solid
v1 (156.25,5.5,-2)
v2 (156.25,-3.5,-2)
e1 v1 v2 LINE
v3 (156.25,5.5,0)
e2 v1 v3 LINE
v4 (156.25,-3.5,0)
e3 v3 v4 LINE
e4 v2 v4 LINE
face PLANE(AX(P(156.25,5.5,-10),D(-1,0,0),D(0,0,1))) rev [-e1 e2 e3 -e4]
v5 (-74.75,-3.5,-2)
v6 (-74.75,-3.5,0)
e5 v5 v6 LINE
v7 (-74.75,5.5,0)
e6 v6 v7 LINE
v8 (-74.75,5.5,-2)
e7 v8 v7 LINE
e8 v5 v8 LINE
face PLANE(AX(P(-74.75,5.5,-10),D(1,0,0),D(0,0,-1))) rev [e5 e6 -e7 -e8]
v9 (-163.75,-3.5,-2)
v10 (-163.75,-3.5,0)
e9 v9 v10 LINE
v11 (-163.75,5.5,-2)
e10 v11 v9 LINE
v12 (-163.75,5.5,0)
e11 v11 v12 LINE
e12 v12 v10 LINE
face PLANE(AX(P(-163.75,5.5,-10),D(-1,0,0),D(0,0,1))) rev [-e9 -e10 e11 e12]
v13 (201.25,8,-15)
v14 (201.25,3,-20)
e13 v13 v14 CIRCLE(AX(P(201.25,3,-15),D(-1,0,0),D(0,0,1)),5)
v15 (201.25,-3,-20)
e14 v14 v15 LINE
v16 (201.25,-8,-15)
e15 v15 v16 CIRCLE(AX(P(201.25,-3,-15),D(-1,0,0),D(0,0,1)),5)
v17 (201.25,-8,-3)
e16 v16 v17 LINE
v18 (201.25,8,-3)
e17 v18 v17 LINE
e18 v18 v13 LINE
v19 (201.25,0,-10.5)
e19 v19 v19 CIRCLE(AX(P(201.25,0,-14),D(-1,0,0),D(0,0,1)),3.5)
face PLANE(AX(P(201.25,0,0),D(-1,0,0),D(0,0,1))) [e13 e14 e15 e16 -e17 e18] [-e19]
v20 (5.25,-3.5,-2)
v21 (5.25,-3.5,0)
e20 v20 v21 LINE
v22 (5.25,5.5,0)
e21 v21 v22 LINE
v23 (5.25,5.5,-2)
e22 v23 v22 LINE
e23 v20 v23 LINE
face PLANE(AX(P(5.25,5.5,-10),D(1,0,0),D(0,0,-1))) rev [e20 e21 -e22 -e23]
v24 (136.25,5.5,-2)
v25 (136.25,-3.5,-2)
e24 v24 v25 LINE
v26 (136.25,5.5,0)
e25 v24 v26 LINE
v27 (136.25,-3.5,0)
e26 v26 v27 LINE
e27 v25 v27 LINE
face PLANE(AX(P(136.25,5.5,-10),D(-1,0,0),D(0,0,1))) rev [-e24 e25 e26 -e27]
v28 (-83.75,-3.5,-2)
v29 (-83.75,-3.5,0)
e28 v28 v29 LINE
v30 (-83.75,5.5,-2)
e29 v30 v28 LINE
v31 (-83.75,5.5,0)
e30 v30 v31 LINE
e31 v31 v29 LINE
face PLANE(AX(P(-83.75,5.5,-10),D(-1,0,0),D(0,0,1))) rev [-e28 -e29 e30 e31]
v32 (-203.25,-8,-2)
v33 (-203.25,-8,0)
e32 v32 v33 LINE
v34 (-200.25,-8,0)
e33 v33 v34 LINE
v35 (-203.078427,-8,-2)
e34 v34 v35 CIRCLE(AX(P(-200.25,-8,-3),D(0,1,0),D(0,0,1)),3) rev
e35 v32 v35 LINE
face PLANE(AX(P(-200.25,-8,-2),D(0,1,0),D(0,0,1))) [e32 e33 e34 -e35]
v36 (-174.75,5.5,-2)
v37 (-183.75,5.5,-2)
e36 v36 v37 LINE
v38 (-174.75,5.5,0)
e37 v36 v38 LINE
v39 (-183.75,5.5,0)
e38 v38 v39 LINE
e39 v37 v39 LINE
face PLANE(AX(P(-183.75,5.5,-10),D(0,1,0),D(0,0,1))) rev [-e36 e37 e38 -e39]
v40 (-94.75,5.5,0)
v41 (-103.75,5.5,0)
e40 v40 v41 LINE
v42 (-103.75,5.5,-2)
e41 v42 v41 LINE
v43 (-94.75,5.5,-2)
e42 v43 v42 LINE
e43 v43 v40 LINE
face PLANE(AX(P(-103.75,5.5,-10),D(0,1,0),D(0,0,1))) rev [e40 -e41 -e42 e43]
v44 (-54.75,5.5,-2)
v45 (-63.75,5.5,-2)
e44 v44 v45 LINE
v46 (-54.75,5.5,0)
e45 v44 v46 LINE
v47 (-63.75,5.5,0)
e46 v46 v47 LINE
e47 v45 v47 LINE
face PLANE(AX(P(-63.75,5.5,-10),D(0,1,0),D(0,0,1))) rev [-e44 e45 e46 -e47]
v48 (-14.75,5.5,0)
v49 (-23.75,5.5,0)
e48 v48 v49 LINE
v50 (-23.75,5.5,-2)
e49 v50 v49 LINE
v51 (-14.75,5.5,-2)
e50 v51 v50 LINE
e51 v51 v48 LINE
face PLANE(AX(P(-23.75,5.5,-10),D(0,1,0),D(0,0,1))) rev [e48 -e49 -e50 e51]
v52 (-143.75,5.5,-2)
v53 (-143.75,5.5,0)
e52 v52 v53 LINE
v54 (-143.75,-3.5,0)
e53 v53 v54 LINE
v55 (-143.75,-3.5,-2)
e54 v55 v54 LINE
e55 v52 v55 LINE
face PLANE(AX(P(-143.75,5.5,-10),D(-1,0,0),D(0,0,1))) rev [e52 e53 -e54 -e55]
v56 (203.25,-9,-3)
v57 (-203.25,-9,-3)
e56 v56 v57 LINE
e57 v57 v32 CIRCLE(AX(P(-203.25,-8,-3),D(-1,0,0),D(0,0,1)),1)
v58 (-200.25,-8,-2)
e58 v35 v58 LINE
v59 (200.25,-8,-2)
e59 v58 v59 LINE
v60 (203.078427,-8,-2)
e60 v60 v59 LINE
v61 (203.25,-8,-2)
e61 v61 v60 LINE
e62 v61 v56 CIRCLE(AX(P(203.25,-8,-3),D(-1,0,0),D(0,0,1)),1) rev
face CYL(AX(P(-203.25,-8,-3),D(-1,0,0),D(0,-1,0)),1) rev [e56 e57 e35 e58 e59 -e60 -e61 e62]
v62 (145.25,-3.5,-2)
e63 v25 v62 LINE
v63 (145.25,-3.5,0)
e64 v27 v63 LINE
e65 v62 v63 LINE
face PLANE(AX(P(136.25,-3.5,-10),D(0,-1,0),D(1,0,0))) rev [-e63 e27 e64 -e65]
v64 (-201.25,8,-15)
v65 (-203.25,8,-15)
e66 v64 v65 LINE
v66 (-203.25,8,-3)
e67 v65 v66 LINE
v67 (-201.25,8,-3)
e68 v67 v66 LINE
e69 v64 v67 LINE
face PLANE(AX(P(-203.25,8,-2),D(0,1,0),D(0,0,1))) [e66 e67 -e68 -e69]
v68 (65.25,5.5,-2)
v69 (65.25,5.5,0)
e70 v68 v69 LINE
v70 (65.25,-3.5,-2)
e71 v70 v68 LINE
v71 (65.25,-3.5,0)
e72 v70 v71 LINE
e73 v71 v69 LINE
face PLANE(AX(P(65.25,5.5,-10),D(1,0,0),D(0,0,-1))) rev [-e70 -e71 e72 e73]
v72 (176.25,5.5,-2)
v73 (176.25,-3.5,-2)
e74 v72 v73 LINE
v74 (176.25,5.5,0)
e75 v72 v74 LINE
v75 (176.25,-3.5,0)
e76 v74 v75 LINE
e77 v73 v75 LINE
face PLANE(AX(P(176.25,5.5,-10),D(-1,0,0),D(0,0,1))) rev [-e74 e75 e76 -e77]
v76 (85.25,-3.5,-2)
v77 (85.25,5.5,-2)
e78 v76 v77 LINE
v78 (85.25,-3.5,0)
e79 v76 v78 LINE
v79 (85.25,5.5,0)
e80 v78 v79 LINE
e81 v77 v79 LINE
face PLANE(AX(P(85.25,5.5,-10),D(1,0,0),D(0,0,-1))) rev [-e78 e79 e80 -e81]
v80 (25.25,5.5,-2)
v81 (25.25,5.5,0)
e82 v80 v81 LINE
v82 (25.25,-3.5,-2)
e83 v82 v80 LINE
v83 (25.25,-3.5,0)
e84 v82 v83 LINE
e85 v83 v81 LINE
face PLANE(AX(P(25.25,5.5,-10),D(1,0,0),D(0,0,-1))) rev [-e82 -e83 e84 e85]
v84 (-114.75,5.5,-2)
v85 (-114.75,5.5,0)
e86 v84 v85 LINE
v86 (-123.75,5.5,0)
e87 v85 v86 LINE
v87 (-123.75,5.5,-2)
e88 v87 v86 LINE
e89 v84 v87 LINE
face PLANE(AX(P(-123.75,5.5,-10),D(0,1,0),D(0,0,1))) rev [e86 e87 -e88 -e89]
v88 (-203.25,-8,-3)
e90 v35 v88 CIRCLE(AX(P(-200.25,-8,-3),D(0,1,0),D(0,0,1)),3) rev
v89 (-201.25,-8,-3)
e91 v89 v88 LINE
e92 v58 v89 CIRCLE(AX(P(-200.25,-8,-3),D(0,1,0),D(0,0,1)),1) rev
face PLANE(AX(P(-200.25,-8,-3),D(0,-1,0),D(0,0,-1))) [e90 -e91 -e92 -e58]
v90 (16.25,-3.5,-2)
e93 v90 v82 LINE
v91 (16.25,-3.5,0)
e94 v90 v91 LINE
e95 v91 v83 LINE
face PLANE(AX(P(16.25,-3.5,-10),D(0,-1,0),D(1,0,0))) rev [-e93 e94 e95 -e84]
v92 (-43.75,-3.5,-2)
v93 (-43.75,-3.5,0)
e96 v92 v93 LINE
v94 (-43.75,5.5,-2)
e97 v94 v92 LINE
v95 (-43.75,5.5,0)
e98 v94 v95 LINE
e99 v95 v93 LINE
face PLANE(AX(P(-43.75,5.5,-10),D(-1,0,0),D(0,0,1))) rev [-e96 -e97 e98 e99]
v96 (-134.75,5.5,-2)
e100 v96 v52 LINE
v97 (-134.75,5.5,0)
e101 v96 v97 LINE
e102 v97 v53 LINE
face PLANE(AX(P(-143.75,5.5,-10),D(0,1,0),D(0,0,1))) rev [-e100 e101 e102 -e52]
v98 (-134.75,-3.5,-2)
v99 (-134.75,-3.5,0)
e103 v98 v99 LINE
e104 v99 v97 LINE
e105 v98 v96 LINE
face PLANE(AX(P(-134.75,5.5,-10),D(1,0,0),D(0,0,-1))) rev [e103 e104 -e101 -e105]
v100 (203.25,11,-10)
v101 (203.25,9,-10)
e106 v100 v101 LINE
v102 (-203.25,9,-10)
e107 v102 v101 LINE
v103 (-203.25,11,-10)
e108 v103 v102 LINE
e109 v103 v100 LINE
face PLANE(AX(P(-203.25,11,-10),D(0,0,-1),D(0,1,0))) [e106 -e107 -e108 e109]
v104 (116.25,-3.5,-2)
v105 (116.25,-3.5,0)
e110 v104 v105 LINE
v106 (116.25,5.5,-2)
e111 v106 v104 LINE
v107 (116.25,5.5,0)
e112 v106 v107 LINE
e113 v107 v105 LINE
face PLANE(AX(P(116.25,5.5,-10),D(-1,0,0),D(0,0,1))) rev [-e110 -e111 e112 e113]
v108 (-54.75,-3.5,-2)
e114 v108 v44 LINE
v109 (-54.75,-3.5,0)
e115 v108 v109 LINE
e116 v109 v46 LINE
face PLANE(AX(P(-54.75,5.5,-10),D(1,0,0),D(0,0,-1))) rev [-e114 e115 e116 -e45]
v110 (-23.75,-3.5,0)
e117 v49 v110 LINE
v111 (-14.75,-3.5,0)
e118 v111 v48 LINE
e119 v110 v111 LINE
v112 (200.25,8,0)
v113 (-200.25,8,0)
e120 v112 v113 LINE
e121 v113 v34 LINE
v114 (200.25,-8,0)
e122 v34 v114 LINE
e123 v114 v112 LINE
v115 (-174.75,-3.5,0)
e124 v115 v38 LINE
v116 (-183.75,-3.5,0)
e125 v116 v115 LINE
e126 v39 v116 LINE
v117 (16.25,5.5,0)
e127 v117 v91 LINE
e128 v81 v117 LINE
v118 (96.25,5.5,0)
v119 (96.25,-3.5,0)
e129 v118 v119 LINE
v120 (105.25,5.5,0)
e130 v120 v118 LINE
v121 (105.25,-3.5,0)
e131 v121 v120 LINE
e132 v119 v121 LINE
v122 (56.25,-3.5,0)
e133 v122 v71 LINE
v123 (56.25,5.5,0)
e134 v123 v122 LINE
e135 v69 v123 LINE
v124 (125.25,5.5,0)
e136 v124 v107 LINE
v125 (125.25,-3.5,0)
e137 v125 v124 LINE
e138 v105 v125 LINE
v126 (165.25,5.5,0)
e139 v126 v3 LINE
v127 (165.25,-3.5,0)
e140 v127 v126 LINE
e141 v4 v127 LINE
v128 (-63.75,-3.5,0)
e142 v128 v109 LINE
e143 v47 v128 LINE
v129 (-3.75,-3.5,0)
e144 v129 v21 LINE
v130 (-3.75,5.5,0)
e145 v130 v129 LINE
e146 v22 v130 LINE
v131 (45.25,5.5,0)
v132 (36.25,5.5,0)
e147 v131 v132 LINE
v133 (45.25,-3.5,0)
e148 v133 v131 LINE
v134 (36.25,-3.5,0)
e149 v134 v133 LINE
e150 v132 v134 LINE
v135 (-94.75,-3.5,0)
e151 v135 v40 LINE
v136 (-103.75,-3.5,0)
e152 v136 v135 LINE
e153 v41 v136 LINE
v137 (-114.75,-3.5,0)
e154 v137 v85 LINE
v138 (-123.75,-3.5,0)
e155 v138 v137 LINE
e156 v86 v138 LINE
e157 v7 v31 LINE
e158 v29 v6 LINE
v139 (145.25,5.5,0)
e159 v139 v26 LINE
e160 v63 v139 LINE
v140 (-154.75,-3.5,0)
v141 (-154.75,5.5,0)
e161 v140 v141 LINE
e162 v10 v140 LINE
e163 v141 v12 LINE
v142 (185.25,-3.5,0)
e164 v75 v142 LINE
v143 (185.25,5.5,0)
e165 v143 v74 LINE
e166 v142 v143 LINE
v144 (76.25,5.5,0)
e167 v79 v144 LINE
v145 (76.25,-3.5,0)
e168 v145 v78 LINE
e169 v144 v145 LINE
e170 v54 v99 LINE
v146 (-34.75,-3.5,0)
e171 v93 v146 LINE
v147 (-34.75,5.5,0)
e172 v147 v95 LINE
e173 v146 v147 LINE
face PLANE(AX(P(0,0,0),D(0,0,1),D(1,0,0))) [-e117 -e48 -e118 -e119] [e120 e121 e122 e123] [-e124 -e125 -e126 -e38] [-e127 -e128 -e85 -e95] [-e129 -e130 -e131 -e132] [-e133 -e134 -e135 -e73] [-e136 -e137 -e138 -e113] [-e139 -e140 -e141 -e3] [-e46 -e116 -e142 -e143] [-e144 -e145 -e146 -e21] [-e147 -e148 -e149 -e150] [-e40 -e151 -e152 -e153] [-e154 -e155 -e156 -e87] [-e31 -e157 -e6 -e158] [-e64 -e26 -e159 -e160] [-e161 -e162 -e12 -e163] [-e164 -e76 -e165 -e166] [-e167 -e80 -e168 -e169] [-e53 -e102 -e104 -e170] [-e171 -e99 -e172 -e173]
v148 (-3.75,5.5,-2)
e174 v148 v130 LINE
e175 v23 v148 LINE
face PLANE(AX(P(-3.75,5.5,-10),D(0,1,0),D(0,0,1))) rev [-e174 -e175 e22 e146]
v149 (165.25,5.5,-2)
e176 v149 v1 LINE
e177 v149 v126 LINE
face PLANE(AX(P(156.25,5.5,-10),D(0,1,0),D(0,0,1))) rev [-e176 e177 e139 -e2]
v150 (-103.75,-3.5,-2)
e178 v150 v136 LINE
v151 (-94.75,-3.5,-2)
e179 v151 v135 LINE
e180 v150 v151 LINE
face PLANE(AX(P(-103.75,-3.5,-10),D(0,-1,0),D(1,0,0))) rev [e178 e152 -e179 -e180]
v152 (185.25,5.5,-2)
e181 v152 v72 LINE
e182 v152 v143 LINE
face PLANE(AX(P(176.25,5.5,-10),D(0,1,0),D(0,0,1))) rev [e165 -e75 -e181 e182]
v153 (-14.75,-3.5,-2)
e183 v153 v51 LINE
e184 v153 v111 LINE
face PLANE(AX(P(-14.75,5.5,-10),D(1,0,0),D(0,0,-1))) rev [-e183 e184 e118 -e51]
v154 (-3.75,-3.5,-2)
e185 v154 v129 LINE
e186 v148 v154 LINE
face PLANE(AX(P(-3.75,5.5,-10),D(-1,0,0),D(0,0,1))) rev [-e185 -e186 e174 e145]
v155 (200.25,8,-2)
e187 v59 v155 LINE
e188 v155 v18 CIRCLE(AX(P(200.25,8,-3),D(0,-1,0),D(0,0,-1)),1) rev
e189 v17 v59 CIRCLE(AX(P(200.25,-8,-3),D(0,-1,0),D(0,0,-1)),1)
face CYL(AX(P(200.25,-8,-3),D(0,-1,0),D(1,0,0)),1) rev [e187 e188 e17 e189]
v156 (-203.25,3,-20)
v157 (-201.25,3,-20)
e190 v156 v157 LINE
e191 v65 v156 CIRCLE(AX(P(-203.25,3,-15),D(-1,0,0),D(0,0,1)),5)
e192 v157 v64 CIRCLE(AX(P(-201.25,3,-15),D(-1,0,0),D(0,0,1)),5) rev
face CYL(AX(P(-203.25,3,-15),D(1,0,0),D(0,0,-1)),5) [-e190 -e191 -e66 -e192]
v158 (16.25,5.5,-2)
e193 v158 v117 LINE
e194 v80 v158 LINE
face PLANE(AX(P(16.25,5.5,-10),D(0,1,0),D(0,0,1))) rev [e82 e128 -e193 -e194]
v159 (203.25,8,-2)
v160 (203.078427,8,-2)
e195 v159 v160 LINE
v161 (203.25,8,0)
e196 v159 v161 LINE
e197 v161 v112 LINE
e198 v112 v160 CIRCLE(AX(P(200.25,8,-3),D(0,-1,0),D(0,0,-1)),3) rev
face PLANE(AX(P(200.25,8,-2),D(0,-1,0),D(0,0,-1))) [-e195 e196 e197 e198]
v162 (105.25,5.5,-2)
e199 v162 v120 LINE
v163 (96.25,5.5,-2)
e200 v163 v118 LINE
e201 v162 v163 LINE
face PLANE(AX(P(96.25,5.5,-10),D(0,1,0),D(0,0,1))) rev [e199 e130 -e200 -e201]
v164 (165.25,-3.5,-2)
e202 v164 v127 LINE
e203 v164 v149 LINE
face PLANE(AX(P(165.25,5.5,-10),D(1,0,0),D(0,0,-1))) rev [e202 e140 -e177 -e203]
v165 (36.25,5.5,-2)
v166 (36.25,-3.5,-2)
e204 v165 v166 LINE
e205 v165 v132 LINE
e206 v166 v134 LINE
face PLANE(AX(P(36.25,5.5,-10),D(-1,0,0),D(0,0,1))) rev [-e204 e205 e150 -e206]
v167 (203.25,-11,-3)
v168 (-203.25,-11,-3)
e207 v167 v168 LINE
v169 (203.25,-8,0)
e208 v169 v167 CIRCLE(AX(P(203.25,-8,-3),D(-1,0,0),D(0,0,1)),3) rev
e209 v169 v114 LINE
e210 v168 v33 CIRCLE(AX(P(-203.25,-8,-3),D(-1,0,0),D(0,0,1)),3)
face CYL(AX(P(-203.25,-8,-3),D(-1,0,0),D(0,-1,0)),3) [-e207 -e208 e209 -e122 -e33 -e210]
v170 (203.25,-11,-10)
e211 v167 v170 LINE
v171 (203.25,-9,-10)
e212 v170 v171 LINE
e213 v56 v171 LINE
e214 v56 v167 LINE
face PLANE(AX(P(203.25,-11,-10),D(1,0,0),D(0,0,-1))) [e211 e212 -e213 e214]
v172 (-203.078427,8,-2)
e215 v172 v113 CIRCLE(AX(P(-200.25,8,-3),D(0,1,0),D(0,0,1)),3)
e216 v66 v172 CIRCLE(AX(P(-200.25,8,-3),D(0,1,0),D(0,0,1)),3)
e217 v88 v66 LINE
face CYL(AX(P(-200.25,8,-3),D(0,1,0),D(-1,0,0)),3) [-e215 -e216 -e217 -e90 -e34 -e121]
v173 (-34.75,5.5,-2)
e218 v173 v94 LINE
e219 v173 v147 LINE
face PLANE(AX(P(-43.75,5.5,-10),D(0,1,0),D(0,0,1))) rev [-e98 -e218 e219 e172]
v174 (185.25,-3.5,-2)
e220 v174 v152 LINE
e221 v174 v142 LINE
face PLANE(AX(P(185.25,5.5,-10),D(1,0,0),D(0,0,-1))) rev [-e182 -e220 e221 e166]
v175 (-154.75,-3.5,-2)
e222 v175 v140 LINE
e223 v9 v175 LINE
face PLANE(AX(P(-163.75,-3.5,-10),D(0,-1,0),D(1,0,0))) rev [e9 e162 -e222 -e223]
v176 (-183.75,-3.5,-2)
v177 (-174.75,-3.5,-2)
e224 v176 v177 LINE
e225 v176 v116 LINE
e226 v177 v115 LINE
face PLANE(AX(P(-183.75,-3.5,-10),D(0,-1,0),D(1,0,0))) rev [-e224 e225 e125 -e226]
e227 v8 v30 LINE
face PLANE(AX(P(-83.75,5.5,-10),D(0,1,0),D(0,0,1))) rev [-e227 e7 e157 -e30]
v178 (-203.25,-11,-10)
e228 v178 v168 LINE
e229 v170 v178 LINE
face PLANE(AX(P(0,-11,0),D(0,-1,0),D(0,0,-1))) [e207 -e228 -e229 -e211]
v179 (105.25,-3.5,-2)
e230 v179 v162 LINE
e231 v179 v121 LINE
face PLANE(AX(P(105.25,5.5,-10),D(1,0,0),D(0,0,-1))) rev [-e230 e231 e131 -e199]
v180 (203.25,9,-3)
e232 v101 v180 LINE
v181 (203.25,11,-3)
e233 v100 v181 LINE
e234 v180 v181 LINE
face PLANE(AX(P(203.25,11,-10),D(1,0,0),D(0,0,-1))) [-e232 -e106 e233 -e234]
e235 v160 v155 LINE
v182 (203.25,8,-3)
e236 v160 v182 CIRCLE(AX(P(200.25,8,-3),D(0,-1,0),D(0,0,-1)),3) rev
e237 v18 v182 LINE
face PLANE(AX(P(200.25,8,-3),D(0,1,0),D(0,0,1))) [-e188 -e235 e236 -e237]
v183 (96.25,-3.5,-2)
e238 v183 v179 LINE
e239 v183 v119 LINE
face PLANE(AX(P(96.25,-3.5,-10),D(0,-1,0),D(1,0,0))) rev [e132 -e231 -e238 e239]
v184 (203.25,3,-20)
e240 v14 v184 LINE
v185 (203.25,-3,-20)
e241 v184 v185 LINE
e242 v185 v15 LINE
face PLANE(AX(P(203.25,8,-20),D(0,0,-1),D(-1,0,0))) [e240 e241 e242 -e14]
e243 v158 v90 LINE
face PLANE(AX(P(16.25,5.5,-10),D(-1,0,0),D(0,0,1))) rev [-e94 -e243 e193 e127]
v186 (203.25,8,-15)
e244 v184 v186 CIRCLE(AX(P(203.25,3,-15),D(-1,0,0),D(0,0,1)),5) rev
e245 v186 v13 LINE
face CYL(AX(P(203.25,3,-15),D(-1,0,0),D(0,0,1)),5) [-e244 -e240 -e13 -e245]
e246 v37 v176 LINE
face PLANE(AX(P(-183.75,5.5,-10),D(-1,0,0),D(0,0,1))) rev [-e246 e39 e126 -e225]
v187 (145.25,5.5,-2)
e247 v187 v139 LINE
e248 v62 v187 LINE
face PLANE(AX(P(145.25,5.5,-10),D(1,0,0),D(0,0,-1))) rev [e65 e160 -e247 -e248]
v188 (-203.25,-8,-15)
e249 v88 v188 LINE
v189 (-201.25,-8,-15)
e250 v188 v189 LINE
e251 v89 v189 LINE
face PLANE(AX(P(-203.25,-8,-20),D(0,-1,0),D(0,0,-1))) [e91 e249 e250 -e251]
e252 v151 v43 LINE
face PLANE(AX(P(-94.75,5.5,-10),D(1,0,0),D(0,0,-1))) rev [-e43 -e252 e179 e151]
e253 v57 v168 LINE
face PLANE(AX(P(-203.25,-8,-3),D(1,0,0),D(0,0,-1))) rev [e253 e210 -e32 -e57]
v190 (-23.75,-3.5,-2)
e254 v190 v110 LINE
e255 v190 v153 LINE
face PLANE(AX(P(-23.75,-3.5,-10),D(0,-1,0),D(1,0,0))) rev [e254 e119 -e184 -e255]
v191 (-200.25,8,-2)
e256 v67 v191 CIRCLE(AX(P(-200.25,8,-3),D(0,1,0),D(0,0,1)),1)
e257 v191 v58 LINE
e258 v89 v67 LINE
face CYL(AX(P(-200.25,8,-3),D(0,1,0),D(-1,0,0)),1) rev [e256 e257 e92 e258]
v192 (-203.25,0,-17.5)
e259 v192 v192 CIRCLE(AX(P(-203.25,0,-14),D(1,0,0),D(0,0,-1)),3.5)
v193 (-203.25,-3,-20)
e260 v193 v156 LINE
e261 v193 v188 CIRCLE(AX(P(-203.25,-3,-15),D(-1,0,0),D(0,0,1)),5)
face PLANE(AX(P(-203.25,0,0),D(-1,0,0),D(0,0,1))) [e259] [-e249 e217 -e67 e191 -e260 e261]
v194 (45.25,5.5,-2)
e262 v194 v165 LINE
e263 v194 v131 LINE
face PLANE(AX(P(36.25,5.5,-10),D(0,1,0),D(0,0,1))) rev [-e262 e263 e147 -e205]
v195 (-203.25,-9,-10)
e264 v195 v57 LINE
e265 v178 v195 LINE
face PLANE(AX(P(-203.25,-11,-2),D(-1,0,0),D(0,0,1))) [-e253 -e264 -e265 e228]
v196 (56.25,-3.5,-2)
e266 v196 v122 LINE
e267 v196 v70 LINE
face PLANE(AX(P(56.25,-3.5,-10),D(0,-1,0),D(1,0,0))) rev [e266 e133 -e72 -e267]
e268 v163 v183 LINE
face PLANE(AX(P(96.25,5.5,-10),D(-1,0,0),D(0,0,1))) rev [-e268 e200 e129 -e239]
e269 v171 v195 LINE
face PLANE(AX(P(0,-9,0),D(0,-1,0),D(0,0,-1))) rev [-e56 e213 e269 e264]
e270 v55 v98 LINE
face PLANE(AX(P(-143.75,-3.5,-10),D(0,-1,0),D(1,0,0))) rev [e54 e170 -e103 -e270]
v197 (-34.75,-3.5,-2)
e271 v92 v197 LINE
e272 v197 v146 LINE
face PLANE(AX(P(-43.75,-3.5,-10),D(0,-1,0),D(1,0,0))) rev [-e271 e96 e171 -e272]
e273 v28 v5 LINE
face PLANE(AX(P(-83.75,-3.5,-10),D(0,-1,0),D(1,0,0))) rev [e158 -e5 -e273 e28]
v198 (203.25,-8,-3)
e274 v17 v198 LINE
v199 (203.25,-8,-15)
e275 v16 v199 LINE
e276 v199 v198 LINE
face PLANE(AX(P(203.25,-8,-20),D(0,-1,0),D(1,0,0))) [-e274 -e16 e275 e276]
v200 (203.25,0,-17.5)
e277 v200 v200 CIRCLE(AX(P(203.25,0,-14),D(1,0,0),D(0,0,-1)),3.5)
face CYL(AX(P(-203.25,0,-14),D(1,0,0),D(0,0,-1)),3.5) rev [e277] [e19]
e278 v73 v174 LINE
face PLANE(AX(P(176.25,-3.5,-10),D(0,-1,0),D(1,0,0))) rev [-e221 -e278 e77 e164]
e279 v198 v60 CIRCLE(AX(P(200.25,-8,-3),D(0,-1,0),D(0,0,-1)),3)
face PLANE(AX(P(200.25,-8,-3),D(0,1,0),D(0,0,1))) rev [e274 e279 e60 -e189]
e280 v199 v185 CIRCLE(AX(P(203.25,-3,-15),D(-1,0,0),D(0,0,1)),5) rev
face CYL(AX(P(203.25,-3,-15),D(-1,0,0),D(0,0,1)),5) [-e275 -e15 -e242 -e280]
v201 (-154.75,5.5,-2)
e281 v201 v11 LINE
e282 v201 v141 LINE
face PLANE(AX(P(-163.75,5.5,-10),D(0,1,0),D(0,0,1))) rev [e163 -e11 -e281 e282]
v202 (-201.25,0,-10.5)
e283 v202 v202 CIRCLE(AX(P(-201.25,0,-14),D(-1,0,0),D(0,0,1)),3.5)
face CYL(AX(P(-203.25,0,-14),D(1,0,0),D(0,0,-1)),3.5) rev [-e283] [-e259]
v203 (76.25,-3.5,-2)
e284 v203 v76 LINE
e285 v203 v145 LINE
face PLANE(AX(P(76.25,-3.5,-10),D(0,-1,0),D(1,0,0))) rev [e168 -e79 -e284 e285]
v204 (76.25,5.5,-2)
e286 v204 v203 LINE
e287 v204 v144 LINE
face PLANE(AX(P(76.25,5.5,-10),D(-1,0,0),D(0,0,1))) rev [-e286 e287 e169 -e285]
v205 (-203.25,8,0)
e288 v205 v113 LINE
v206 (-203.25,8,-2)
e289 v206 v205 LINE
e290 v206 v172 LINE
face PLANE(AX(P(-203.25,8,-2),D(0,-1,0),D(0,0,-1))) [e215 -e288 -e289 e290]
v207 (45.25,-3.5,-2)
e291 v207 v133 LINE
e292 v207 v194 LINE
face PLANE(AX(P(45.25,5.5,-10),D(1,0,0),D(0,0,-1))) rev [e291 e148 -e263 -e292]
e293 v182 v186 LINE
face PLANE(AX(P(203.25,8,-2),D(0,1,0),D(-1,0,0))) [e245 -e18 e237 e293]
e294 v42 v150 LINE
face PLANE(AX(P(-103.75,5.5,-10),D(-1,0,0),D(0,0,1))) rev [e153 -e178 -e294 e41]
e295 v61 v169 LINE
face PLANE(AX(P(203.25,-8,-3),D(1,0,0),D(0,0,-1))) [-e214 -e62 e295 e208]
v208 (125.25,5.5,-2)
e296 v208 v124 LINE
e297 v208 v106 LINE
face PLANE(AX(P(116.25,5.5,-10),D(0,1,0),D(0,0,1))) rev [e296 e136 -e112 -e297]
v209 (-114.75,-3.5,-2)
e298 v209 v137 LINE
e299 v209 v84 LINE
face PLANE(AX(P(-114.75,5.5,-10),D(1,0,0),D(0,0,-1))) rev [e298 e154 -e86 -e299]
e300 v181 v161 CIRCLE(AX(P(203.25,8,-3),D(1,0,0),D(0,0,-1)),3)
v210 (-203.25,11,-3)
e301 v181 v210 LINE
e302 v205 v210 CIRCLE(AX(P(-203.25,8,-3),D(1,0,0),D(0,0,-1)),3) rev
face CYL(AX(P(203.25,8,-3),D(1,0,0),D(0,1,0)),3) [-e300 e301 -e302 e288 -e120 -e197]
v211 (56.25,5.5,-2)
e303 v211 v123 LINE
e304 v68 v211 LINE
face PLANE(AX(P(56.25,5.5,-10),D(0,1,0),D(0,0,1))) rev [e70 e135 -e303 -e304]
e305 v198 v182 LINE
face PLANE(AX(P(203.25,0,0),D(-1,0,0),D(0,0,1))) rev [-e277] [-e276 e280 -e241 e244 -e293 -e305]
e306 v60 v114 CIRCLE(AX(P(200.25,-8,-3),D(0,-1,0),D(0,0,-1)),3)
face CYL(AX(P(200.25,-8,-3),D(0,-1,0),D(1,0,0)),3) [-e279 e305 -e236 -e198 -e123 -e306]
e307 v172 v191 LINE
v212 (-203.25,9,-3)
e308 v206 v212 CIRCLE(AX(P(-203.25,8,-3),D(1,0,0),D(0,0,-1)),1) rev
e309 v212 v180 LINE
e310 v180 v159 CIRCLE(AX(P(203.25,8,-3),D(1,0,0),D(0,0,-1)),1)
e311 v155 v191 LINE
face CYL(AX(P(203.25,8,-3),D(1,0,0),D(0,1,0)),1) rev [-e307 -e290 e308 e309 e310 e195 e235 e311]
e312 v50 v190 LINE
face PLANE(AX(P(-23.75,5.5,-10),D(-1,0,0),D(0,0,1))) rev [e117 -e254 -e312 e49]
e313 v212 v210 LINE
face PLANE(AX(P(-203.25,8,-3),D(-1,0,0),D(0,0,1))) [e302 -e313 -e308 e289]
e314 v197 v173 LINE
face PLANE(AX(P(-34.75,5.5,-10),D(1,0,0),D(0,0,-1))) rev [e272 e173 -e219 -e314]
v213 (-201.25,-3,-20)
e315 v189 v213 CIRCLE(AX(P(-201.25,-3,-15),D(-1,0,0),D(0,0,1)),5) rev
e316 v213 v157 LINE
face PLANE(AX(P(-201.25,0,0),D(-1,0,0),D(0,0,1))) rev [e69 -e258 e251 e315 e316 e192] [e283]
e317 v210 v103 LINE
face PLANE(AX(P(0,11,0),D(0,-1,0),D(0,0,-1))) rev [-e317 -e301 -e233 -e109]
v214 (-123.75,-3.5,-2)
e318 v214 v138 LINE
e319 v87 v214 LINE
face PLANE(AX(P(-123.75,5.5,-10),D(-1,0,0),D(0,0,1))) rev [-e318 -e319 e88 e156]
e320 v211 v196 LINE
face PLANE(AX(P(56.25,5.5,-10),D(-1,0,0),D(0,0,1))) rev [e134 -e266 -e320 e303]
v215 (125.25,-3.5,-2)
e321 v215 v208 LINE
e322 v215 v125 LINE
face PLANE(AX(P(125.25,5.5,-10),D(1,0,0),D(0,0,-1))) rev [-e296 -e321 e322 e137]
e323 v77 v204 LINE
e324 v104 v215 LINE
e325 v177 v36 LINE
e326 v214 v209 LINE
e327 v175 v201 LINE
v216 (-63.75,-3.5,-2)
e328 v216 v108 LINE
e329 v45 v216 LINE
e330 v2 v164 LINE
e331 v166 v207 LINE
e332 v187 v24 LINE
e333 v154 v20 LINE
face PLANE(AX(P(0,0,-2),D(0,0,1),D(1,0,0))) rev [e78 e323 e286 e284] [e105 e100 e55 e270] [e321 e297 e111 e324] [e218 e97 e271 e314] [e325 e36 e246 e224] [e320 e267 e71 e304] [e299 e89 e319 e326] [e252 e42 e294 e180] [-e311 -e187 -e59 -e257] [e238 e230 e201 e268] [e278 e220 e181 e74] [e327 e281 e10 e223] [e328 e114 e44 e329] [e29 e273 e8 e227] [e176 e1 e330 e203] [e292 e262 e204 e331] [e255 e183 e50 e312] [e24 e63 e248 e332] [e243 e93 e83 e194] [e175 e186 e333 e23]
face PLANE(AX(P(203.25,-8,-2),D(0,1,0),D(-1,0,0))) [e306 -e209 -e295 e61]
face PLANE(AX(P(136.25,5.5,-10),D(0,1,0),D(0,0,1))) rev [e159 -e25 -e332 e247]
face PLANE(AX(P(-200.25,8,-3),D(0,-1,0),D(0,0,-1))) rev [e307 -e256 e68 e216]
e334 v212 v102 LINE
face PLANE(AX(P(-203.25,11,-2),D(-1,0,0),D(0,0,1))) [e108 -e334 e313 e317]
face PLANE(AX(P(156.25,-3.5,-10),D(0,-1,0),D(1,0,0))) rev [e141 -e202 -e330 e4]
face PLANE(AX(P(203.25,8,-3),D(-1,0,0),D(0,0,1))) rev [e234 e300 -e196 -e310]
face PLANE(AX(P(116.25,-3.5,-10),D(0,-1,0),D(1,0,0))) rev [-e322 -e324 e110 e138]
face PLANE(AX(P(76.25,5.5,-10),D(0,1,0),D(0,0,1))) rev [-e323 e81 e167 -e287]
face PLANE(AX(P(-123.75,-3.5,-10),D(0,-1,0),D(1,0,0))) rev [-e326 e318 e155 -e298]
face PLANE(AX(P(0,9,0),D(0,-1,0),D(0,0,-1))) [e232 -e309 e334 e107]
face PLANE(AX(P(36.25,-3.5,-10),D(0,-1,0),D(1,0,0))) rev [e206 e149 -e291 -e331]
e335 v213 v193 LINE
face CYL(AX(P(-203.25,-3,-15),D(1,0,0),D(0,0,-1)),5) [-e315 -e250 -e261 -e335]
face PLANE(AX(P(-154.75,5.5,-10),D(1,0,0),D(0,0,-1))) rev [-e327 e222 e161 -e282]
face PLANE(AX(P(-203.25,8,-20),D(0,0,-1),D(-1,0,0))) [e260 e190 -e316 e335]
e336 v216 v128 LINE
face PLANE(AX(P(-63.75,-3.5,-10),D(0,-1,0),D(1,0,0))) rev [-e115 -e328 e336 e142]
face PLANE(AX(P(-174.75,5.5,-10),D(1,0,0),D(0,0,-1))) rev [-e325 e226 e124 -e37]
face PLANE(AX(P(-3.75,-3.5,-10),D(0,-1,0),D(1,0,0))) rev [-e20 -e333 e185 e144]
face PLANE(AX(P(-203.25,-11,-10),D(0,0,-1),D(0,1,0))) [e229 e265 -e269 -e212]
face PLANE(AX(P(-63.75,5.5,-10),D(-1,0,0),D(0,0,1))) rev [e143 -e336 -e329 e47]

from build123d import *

# Parameters (mm, degrees)
SKETCH_1_W                         = 406.5
SKETCH_1_H                         = 22
SM_BASE_FLANGE_1_DEPTH             = 2
SM_EDGE_FLANGE_1_STRIP_W           = 10
SM_EDGE_FLANGE_1_STRIP_H           = 2
SM_EDGE_FLANGE_1_STRIP_CUT_DEPTH   = 406.5
SM_EDGE_FLANGE_1_STRIP_2_W         = 10
SM_EDGE_FLANGE_1_STRIP_2_H         = 2
SM_EDGE_FLANGE_1_STRIP_CUT_2_DEPTH = 406.5
SM_EDGE_FLANGE_1_DEPTH             = 406.5
SM_EDGE_FLANGE_1_BEND_DEPTH        = 406.5
SM_EDGE_FLANGE_2_STRIP_W           = 10
SM_EDGE_FLANGE_2_STRIP_H           = 2
SM_EDGE_FLANGE_2_STRIP_CUT_DEPTH   = 16
SM_EDGE_FLANGE_2_STRIP_2_W         = 10
SM_EDGE_FLANGE_2_STRIP_2_H         = 2
SM_EDGE_FLANGE_2_STRIP_CUT_2_DEPTH = 16
SM_EDGE_FLANGE_2_DEPTH             = 16
SM_EDGE_FLANGE_2_BEND_DEPTH        = 16
SKETCH_18_W                        = 9
SKETCH_18_H                        = 9
CUT_EXTRUDE_1_DEPTH                = 10
PATTERN_LINEAR_1_COUNT             = 19
PATTERN_LINEAR_1_PITCH             = 20
FILLET_1_R                         = 5
SKETCH_19_R                        = 3.5
CUT_EXTRUDE_2_DEPTH                = 408.140332072


# Sheet-metal steps are written as plain solids
with BuildPart() as part:
    # Sketch 1 → 基体-法兰1 (new body)
    with BuildSketch(Plane.XY):
        Rectangle(SKETCH_1_W, SKETCH_1_H)
    extrude(amount=-SM_BASE_FLANGE_1_DEPTH)

    # 边线-法兰1 strip (across the edge) → 边线-法兰1 strip cut (cut)
    with BuildSketch(Plane(origin=(203.25, -11, -2), x_dir=(0, 1, 0), z_dir=(-1, 0, 0))):
        with Locations((-2, -1)):
            Rectangle(SM_EDGE_FLANGE_1_STRIP_W, SM_EDGE_FLANGE_1_STRIP_H)
    extrude(amount=SM_EDGE_FLANGE_1_STRIP_CUT_DEPTH, mode=Mode.SUBTRACT)

    # 边线-法兰1 strip 2 (across the edge) → 边线-法兰1 strip cut 2 (cut)
    with BuildSketch(Plane(origin=(-203.25, 11, -2), x_dir=(0, -1, 0), z_dir=(1, 0, 0))):
        with Locations((-2, -1)):
            Rectangle(SM_EDGE_FLANGE_1_STRIP_2_W, SM_EDGE_FLANGE_1_STRIP_2_H)
    extrude(amount=SM_EDGE_FLANGE_1_STRIP_CUT_2_DEPTH, mode=Mode.SUBTRACT)

    # 边线-法兰1 section (across the edge) → 边线-法兰1 (add)
    with BuildSketch(Plane(origin=(203.25, -11, -2), x_dir=(0, 1, 0), z_dir=(-1, 0, 0))):
        with BuildLine():
            Line((0, 1), (0, 8))
            Line((0, 8), (2, 8))
            Line((2, 8), (2, 1))
            ThreePointArc((2, 1), (2.292893219, 0.292893219), (3, 0))
            Line((3, 0), (3, -2))
            ThreePointArc((3, -2), (0.878679656, -1.121320344), (0, 1))
        make_face()
    extrude(amount=SM_EDGE_FLANGE_1_DEPTH)

    # 边线-法兰1 section 2 (across the edge) → 边线-法兰1 bend (add)
    with BuildSketch(Plane(origin=(-203.25, 11, -2), x_dir=(0, -1, 0), z_dir=(1, 0, 0))):
        with BuildLine():
            Line((0, 1), (0, 8))
            Line((0, 8), (2, 8))
            Line((2, 8), (2, 1))
            ThreePointArc((2, 1), (2.292893219, 0.292893219), (3, 0))
            Line((3, 0), (3, -2))
            ThreePointArc((3, -2), (0.878679656, -1.121320344), (0, 1))
        make_face()
    extrude(amount=SM_EDGE_FLANGE_1_BEND_DEPTH)

    # 边线-法兰2 strip (across the edge) → 边线-法兰2 strip cut (cut)
    with BuildSketch(Plane(origin=(-203.25, -8, -2), x_dir=(1, 0, 0), z_dir=(0, 1, 0))):
        with Locations((-2, -1)):
            Rectangle(SM_EDGE_FLANGE_2_STRIP_W, SM_EDGE_FLANGE_2_STRIP_H)
    extrude(amount=SM_EDGE_FLANGE_2_STRIP_CUT_DEPTH, mode=Mode.SUBTRACT)

    # 边线-法兰2 strip 2 (across the edge) → 边线-法兰2 strip cut 2 (cut)
    with BuildSketch(Plane(origin=(203.25, 8, -2), x_dir=(-1, 0, 0), z_dir=(0, -1, 0))):
        with Locations((-2, -1)):
            Rectangle(SM_EDGE_FLANGE_2_STRIP_2_W, SM_EDGE_FLANGE_2_STRIP_2_H)
    extrude(amount=SM_EDGE_FLANGE_2_STRIP_CUT_2_DEPTH, mode=Mode.SUBTRACT)

    # 边线-法兰2 section (across the edge) → 边线-法兰2 (add)
    with BuildSketch(Plane(origin=(-203.25, -8, -2), x_dir=(1, 0, 0), z_dir=(0, 1, 0))):
        with BuildLine():
            Line((0, 1), (0, 18))
            Line((0, 18), (2, 18))
            Line((2, 18), (2, 1))
            ThreePointArc((2, 1), (2.292893219, 0.292893219), (3, 0))
            Line((3, 0), (3, -2))
            ThreePointArc((3, -2), (0.878679656, -1.121320344), (0, 1))
        make_face()
    extrude(amount=SM_EDGE_FLANGE_2_DEPTH)

    # 边线-法兰2 section 2 (across the edge) → 边线-法兰2 bend (add)
    with BuildSketch(Plane(origin=(203.25, 8, -2), x_dir=(-1, 0, 0), z_dir=(0, -1, 0))):
        with BuildLine():
            Line((0, 1), (0, 18))
            Line((0, 18), (2, 18))
            Line((2, 18), (2, 1))
            ThreePointArc((2, 1), (2.292893219, 0.292893219), (3, 0))
            Line((3, 0), (3, -2))
            ThreePointArc((3, -2), (0.878679656, -1.121320344), (0, 1))
        make_face()
    extrude(amount=SM_EDGE_FLANGE_2_BEND_DEPTH)

    # 草图18 → 切除-拉伸1 (cut)
    with BuildSketch(Plane.XY):
        with Locations((-179.25, 1)):
            Rectangle(SKETCH_18_W, SKETCH_18_H)
    cut_extrude_1 = extrude(amount=-CUT_EXTRUDE_1_DEPTH, mode=Mode.SUBTRACT)

    # 阵列(线性)1: 切除-拉伸1 ×19
    with Locations(*[(i * PATTERN_LINEAR_1_PITCH, 0, 0) for i in range(1, PATTERN_LINEAR_1_COUNT)]):
        add(cut_extrude_1, mode=Mode.SUBTRACT)

    # 圆角1
    fillet_1_edges = [part.edges().sort_by_distance(p)[0] for p in [
        (-202.25, -8, -20),
        (-202.25, 8, -20),
        (202.25, 8, -20),
        (202.25, -8, -20),
    ]]
    fillet(fillet_1_edges, radius=FILLET_1_R)

    # 草图19 → 切除-拉伸2 (cut, through all)
    with BuildSketch(Plane(origin=(203.25, 0, 0), x_dir=(0, 0, -1), z_dir=(1, 0, 0))):
        with Locations((14, 0)):
            Circle(SKETCH_19_R)
    extrude(amount=-CUT_EXTRUDE_2_DEPTH, mode=Mode.SUBTRACT)


solid = part.part
